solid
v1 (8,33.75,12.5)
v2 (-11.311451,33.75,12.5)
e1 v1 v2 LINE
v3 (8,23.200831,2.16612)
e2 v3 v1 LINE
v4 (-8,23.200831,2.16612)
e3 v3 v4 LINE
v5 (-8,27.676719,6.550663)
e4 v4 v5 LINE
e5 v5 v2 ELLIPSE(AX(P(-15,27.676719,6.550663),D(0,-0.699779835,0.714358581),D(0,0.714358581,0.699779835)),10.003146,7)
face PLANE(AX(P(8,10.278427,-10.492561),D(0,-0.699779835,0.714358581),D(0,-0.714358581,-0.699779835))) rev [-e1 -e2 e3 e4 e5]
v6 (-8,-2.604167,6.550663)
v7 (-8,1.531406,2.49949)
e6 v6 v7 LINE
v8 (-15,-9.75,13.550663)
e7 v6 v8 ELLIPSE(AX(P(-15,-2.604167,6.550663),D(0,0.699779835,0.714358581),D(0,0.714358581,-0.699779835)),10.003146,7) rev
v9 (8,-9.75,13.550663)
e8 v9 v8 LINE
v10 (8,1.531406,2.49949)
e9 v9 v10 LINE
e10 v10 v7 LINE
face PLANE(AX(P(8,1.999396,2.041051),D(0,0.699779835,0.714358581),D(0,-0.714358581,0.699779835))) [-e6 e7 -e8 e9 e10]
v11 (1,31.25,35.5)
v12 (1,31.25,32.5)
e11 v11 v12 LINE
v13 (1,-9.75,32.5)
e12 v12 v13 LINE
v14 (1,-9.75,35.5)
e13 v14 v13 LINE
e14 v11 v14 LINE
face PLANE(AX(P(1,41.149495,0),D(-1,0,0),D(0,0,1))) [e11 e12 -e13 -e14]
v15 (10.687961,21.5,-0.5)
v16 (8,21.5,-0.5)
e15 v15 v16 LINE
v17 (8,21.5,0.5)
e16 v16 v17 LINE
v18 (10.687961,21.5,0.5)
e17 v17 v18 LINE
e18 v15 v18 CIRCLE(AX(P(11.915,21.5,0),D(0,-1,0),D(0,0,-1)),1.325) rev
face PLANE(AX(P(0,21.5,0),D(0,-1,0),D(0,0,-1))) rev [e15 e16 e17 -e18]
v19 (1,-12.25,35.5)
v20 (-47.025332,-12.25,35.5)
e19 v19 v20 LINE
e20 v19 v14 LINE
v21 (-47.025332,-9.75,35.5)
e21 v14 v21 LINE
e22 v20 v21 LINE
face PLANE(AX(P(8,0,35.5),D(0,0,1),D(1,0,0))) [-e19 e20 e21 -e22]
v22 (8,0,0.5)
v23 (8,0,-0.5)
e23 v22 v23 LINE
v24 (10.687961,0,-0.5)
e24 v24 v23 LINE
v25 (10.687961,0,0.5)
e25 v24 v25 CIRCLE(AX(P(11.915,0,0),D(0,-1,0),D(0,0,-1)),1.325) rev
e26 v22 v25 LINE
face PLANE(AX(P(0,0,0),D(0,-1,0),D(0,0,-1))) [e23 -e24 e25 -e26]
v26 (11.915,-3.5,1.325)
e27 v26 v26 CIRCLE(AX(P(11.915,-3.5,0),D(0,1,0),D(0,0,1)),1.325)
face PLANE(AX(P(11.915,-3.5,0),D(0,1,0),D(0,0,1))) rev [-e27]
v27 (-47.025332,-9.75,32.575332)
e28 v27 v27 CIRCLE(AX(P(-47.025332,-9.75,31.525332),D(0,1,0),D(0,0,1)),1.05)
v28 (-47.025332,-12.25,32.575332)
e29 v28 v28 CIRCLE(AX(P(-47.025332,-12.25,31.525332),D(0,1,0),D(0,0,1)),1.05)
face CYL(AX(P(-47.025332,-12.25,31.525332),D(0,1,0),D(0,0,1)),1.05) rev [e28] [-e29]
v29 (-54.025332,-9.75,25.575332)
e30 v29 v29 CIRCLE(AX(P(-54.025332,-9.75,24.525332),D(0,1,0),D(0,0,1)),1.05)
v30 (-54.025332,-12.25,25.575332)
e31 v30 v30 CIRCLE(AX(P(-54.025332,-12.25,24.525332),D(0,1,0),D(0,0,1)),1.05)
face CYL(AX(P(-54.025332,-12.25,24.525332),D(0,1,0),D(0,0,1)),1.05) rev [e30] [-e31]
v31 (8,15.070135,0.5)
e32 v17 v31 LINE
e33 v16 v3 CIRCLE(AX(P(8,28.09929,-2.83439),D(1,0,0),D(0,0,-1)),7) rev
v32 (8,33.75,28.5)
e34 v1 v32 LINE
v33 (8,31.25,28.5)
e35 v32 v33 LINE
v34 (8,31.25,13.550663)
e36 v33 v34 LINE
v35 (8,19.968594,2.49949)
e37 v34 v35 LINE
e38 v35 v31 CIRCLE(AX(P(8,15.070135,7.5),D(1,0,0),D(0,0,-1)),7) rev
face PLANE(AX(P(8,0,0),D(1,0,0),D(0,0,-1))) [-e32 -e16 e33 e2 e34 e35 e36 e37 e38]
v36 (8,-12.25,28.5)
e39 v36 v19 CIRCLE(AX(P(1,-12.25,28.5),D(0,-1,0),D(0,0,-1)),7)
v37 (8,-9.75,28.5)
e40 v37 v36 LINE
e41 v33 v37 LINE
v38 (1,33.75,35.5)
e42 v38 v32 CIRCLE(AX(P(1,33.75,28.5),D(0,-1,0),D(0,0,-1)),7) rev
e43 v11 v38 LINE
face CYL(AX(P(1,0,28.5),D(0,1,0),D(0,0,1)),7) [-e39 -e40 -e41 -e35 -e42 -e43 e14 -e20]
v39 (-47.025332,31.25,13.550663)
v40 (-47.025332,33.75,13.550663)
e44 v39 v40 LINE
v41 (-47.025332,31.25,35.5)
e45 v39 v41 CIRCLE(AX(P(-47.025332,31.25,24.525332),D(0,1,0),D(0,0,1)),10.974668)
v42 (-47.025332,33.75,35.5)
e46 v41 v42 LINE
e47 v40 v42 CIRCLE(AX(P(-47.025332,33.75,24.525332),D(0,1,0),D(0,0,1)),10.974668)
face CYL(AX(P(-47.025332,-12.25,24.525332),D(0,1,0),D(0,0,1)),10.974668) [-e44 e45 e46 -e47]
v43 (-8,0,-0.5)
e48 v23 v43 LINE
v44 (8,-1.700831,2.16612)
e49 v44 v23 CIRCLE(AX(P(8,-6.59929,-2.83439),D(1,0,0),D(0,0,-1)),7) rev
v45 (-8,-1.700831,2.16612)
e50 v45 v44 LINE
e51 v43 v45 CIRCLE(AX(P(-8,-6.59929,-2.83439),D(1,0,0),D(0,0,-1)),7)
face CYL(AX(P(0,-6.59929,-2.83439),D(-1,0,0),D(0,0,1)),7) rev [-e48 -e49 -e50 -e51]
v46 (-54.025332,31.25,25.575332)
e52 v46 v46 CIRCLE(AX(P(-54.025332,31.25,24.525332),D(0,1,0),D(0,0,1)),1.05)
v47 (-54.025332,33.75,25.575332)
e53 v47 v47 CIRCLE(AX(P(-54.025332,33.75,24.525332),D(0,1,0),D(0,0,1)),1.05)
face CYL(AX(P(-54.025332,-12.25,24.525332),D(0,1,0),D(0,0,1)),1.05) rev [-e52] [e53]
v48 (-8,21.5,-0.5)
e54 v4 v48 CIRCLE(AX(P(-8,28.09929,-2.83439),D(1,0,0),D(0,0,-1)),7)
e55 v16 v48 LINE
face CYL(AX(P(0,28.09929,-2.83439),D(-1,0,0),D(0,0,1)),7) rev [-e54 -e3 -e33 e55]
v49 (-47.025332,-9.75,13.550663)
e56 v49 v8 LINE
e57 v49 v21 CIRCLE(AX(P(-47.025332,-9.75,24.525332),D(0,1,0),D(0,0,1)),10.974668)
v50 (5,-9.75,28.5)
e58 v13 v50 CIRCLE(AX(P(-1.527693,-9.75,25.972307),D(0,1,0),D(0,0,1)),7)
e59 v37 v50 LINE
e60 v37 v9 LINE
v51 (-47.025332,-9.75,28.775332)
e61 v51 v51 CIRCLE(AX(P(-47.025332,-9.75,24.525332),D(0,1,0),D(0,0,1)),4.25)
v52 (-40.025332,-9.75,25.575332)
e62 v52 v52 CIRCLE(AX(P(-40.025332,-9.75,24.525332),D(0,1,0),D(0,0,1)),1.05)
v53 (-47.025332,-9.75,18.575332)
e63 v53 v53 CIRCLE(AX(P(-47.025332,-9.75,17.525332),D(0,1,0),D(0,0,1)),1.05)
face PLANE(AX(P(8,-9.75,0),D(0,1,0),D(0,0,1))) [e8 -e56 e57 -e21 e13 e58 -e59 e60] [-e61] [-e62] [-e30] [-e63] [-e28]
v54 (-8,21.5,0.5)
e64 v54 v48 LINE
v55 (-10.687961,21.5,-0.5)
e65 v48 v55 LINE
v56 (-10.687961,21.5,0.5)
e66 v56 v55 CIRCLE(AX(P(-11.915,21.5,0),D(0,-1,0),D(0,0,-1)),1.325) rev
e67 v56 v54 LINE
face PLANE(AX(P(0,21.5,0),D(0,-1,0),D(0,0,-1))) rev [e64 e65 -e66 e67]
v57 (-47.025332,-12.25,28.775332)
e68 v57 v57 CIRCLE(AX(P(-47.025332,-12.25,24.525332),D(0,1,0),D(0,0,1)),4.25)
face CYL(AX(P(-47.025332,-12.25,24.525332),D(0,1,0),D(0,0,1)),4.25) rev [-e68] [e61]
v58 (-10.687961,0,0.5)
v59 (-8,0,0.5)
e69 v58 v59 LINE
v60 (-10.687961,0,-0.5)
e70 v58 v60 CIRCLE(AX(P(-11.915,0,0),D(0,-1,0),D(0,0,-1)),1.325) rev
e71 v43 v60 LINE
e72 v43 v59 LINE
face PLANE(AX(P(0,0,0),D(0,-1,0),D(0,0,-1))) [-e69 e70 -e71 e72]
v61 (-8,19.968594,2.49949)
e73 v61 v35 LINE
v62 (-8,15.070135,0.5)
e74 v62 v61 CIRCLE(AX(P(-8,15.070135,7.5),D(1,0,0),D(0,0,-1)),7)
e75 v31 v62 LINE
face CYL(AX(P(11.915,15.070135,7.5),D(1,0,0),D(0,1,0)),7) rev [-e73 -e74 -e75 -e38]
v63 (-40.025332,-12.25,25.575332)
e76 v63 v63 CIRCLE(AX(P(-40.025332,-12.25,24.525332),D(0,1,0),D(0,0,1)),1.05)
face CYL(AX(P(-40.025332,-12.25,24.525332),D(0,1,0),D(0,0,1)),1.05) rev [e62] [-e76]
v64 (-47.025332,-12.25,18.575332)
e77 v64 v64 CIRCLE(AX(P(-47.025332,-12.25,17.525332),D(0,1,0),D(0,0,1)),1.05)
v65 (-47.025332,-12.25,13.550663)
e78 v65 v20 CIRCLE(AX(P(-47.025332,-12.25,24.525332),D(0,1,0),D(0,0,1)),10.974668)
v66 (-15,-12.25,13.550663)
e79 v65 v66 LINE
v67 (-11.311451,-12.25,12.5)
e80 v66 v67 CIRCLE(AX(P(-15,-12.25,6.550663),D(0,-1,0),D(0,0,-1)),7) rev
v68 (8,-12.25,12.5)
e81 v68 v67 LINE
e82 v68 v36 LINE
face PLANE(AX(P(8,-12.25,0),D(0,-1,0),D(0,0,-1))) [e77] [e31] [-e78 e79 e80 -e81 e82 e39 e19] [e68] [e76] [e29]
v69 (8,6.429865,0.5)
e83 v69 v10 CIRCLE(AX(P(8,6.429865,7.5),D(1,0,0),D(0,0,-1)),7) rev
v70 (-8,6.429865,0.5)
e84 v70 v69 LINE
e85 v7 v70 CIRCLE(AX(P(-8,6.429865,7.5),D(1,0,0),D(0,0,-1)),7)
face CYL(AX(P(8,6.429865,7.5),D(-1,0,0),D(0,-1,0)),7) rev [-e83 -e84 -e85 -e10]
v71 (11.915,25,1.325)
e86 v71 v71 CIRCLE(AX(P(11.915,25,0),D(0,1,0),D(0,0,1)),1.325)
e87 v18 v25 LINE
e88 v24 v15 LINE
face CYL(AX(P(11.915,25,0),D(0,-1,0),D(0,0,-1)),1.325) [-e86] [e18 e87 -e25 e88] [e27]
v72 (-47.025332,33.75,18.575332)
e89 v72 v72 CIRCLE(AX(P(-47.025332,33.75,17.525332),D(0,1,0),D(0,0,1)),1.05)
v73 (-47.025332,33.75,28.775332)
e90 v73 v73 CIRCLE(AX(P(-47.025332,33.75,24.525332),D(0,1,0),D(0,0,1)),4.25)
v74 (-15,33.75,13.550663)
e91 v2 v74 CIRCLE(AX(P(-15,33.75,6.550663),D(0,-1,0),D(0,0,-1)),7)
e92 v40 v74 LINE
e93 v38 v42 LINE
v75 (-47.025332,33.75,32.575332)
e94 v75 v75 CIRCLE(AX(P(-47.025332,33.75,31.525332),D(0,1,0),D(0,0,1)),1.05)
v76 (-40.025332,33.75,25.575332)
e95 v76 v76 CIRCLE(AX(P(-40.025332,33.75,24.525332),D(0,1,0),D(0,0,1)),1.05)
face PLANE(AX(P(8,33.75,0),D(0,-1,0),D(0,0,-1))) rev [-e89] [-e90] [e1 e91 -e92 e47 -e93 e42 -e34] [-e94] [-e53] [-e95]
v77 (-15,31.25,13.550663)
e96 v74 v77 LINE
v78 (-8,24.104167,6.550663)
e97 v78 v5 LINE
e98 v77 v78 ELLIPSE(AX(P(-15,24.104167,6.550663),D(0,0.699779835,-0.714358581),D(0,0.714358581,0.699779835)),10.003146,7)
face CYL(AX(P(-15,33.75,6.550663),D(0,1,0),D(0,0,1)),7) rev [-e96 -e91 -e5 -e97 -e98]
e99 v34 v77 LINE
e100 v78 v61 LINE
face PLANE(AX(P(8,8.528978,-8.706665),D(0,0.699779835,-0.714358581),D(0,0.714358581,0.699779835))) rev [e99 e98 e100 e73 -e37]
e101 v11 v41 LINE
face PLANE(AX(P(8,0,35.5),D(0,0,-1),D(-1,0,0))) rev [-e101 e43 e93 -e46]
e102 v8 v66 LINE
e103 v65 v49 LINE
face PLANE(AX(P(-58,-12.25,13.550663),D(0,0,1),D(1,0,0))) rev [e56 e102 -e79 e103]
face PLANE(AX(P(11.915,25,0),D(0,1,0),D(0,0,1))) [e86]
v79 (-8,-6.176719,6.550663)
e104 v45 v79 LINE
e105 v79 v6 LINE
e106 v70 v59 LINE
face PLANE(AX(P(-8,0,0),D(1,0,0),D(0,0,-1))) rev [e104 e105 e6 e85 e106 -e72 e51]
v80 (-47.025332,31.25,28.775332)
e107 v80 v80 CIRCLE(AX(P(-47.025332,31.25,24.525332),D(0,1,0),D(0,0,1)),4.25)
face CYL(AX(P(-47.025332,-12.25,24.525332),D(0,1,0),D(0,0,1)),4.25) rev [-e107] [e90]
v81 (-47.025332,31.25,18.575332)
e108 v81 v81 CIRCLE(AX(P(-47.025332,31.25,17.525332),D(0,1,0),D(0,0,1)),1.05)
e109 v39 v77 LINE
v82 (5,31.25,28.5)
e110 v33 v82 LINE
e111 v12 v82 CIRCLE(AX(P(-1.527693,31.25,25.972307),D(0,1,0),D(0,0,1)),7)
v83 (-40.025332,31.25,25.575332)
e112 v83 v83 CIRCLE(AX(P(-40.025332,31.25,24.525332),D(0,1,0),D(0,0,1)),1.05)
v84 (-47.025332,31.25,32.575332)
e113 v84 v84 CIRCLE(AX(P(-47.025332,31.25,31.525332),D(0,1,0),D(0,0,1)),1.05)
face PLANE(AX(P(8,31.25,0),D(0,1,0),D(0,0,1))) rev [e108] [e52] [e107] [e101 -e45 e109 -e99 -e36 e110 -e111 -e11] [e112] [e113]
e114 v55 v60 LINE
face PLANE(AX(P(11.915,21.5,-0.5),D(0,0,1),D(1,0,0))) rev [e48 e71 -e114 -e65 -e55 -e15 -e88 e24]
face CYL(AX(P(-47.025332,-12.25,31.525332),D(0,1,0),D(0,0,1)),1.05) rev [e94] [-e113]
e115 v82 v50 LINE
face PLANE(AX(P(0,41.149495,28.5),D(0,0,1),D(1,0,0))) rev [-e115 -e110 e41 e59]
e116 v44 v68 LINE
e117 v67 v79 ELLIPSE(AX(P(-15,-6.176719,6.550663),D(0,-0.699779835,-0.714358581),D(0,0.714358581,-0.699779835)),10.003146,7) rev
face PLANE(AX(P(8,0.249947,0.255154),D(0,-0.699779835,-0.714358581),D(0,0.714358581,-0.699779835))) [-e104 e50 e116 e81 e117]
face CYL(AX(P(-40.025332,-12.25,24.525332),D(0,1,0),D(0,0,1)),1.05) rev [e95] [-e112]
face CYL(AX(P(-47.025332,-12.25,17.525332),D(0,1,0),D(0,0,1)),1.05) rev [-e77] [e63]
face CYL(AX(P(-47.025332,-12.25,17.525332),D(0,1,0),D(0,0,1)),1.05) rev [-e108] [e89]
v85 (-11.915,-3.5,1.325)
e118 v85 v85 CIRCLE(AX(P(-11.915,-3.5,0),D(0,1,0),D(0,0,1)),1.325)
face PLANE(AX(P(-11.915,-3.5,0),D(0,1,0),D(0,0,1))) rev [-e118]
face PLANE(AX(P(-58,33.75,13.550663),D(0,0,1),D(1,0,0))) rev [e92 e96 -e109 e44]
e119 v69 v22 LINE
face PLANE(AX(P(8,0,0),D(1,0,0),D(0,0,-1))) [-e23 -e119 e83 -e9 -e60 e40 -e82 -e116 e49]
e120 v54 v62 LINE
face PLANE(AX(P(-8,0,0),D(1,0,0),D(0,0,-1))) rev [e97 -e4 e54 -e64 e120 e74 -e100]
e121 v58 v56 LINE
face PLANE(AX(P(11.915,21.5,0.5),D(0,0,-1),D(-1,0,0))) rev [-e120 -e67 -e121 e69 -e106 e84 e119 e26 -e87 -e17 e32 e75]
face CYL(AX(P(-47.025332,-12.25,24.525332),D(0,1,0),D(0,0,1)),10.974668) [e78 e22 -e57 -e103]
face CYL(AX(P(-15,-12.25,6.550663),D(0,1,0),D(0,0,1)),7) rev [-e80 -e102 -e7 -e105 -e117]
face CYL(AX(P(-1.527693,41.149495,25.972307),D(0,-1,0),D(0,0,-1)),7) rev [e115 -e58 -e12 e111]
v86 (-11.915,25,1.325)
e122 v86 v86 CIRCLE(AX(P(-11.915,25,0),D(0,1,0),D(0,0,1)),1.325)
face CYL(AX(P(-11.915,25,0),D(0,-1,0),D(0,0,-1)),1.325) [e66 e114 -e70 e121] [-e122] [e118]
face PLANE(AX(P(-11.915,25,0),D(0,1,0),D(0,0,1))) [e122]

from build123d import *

# Parameters (mm, degrees)
SKETCH1_W           = 23.83
SKETCH1_H           = 1
BOSS_EXTRUDE1_DEPTH = 21.5
SKETCH2_R           = 1.325
BOSS_EXTRUDE2_DEPTH = 14.25
BOSS_EXTRUDE4_DEPTH = 8
SKETCH5_W           = 21.949336604
SKETCH5_H           = 2.5
BOSS_EXTRUDE5_DEPTH = 50
SKETCH6_R           = 4.25
SKETCH6_R_2         = 1.05
CUT_EXTRUDE1_DEPTH  = 83.099025573
FILLET1_R           = 7
FILLET2_R           = 7
FILLET3_R           = 7
BOSS_EXTRUDE6_START = 41
BOSS_EXTRUDE6_DEPTH = 41


with BuildPart() as part:
    # Sketch1 → Boss-Extrude1 (new body)
    with BuildSketch(Plane(origin=(0, 0, 0), x_dir=(1, 0, 0), z_dir=(0, 1, 0))):
        Rectangle(SKETCH1_W, SKETCH1_H)
    extrude(amount=BOSS_EXTRUDE1_DEPTH)

    # Sketch2 → Boss-Extrude2 (add, symmetric)
    with BuildSketch(Plane(origin=(0, 10.75, 0), x_dir=(1, 0, 0), z_dir=(0, 1, 0))):
        with Locations(Location((-11.915, 0, 0), (0, 0, 270))):
            Circle(SKETCH2_R)
        with Locations(Location((11.915, 0, 0), (0, 0, 270))):
            Circle(SKETCH2_R)
    extrude(amount=BOSS_EXTRUDE2_DEPTH, both=True)

    # Sketch4 → Boss-Extrude4 (add, symmetric)
    with BuildSketch(Plane(origin=(0, 0, 0), x_dir=(0, 0, -1), z_dir=(1, 0, 0))):
        Polygon((-0.5, 17.927447783), (-0.5, 21.5), (-12.5, 33.75), (-35.5, 33.75), (-35.5, 31.25), (-13.550663396, 31.25), align=None)
        Polygon((-0.5, 0), (-0.5, 3.572552217), (-13.550663396, -9.75), (-35.5, -9.75), (-35.5, -12.25), (-12.5, -12.25), align=None)
    extrude(amount=BOSS_EXTRUDE4_DEPTH, both=True)

    # Sketch5 → Boss-Extrude5 (add)
    with BuildSketch(Plane.ZY.offset(8)):
        with Locations((24.525331698, 32.5)):
            Rectangle(SKETCH5_W, SKETCH5_H)
        with Locations((24.525331698, -11)):
            Rectangle(SKETCH5_W, SKETCH5_H)
    extrude(amount=BOSS_EXTRUDE5_DEPTH)

    # Sketch6 → Cut-Extrude1 (cut, through all)
    with BuildSketch(Plane(origin=(0, 33.75, 0), x_dir=(1, 0, 0), z_dir=(0, 1, 0))):
        with Locations(Location((-47.025331698, -24.525331698, 0), (0, 0, 270))):
            Circle(SKETCH6_R)
        with Locations(Location((-54.025331698, -24.525331698, 0), (0, 0, 270))):
            Circle(SKETCH6_R_2)
        with Locations(Location((-47.025331698, -17.525331698, 0), (0, 0, 270))):
            Circle(SKETCH6_R_2)
        with Locations(Location((-40.025331698, -24.525331698, 0), (0, 0, 270))):
            Circle(SKETCH6_R_2)
        with Locations(Location((-47.025331698, -31.525331698, 0), (0, 0, 270))):
            Circle(SKETCH6_R_2)
        with BuildLine():
            ThreePointArc((-58, -24.525331743), (-54.785594092, -16.765069336), (-47.025331698, -13.550663396))
            Line((-47.025331698, -13.550663396), (-58, -13.550663396))
            Line((-58, -13.550663396), (-58, -24.525331743))
        make_face()
        with BuildLine():
            ThreePointArc((-47.025331698, -35.5), (-54.78559406, -32.285594092), (-58, -24.525331743))
            Line((-58, -24.525331743), (-58, -35.5))
            Line((-58, -35.5), (-47.025331698, -35.5))
        make_face()
    extrude(amount=-CUT_EXTRUDE1_DEPTH, mode=Mode.SUBTRACT)

    # Fillet1
    # the kernel refuses this fillet: 7 mm, written as the material it adds along each edge
    with BuildSketch(Plane(origin=(-8, -12.25, 13.550663396), x_dir=(-1, 0, 0), z_dir=(0, 1, 0))) as fillet1_piece_1_section:
        with BuildLine():
            CenterArc((FILLET1_R, -FILLET1_R), FILLET1_R, 90, 90)
            Line((0, -FILLET1_R), (0, 0))
            Line((0, 0), (FILLET1_R, 0))
        make_face()
    fillet1_piece_1 = extrude(amount=2.5, mode=Mode.PRIVATE)
    fillet1_piece_1 = split(fillet1_piece_1, bisect_by=Plane(origin=(-10.015975833, -11.661011889, 11.923032054), z_dir=(0, 0.699779834816443, 0.7143585813751185)), keep=Keep.TOP, mode=Mode.PRIVATE)
    fillet1_piece_1 = split(fillet1_piece_1, bisect_by=Plane(origin=(-10.015975833, -9.911562302, 13.708928508), z_dir=(0, -0.699779834816443, -0.7143585813751185)), keep=Keep.TOP, mode=Mode.PRIVATE)
    add(fillet1_piece_1)
    with BuildSketch(Plane(origin=(-8, -12.25, 13.550663396), x_dir=(-1, 0, 0), z_dir=(0, 1, 0))) as fillet1_piece_2_section:
        with BuildLine():
            CenterArc((FILLET1_R, -FILLET1_R), FILLET1_R, 90, 90)
            Line((0, -FILLET1_R), (0, 0))
            Line((0, 0), (FILLET1_R, 0))
        make_face()
    fillet1_piece_2 = extrude(amount=20, mode=Mode.PRIVATE)
    fillet1_piece_2 = split(fillet1_piece_2, bisect_by=Plane(origin=(-8.812454151, -9.294822672, 9.605132414), z_dir=(0, 0.699779834816443, 0.7143585813751185)), keep=Keep.TOP, mode=Mode.PRIVATE)
    fillet1_piece_2 = split(fillet1_piece_2, bisect_by=Plane(origin=(-8.812454151, -9.75, 10.768831879), z_dir=(0, 1, 0)), keep=Keep.TOP, mode=Mode.PRIVATE)
    fillet1_piece_2 = split(fillet1_piece_2, bisect_by=Plane(origin=(-8.812454151, -7.545373085, 11.391028867), z_dir=(0, -0.699779834816443, -0.7143585813751185)), keep=Keep.TOP, mode=Mode.PRIVATE)
    add(fillet1_piece_2)
    with BuildSketch(Plane(origin=(-8, 33.75, 13.550663396), x_dir=(0, 0, -1), z_dir=(0, -1, 0))) as fillet1_piece_3_section:
        with BuildLine():
            CenterArc((FILLET1_R, -FILLET1_R), FILLET1_R, 90, 90)
            Line((0, -FILLET1_R), (0, 0))
            Line((0, 0), (FILLET1_R, 0))
        make_face()
    fillet1_piece_3 = extrude(amount=2.5, mode=Mode.PRIVATE)
    fillet1_piece_3 = split(fillet1_piece_3, bisect_by=Plane(origin=(-10.015975833, 31.411562301, 13.708928507), z_dir=(0, 0.6997798348164432, -0.7143585813751182)), keep=Keep.TOP, mode=Mode.PRIVATE)
    fillet1_piece_3 = split(fillet1_piece_3, bisect_by=Plane(origin=(-10.015975833, 33.161011889, 11.923032054), z_dir=(0, -0.699779834816443, 0.7143585813751185)), keep=Keep.TOP, mode=Mode.PRIVATE)
    add(fillet1_piece_3)
    with BuildSketch(Plane(origin=(-8, 33.75, 13.550663396), x_dir=(0, 0, -1), z_dir=(0, -1, 0))) as fillet1_piece_4_section:
        with BuildLine():
            CenterArc((FILLET1_R, -FILLET1_R), FILLET1_R, 90, 90)
            Line((0, -FILLET1_R), (0, 0))
            Line((0, 0), (FILLET1_R, 0))
        make_face()
    fillet1_piece_4 = extrude(amount=20, mode=Mode.PRIVATE)
    fillet1_piece_4 = split(fillet1_piece_4, bisect_by=Plane(origin=(-8.812454159, 29.045373088, 11.39102887), z_dir=(0, 0.6997798348164432, -0.7143585813751182)), keep=Keep.TOP, mode=Mode.PRIVATE)
    fillet1_piece_4 = split(fillet1_piece_4, bisect_by=Plane(origin=(-8.812454159, 30.794822675, 9.605132416), z_dir=(0, -0.699779834816443, 0.7143585813751185)), keep=Keep.TOP, mode=Mode.PRIVATE)
    fillet1_piece_4 = split(fillet1_piece_4, bisect_by=Plane(origin=(-8.812454159, 31.25, 10.768831882), z_dir=(0, -1, 0)), keep=Keep.TOP, mode=Mode.PRIVATE)
    add(fillet1_piece_4)
    # the kernel refuses this fillet: 7 mm, written as the material it takes off along each edge
    with BuildSketch(Plane(origin=(8, 7.75, 35.5), x_dir=(0, 0, -1), z_dir=(0, -1, 0))) as fillet1_2_piece_1:
        with BuildLine():
            CenterArc((FILLET1_R, -FILLET1_R), FILLET1_R, 90, 90)
            Line((0, -FILLET1_R), (0, 0))
            Line((0, 0), (FILLET1_R, 0))
        make_face()
    extrude(amount=37.5, mode=Mode.SUBTRACT)
    with BuildSketch(Plane(origin=(8, 51.25, 35.5), x_dir=(-1, 0, 0), z_dir=(0, -1, 0))) as fillet1_2_piece_2:
        with BuildLine():
            CenterArc((FILLET1_R, FILLET1_R), FILLET1_R, 180, 90)
            Line((0, FILLET1_R), (0, 0))
            Line((0, 0), (FILLET1_R, 0))
        make_face()
    extrude(amount=37.5, mode=Mode.SUBTRACT)

    # Fillet2
    fillet2_edges = [part.edges().sort_by_distance(p)[0] for p in [
        (0, 17.927447783, 0.5),
        (0, 3.572552217, 0.5),
    ]]
    fillet(fillet2_edges, radius=FILLET2_R)

    # Fillet3
    # the kernel refuses this fillet: 7 mm, written as the material it adds along each edge
    with BuildSketch(Plane(origin=(-8, 21.5, 0.5), x_dir=(0, 0.7143585813744706, 0.6997798348171044), z_dir=(1, 0, 0))) as fillet3_piece_1:
        with BuildLine():
            CenterArc((2.380920079, -7), FILLET3_R, 90, 26.110260914)
            Line((-0.699779835, -0.714358581), (0, 0))
            Line((0, 0), (2.380920079, 0))
        make_face()
    extrude(amount=16)
    with BuildSketch(Plane(origin=(8, 0, 0.5), x_dir=(0, 0, -1), z_dir=(-1, 0, 0))) as fillet3_piece_2:
        with BuildLine():
            CenterArc((3.33439021, 6.599289533), FILLET3_R, 224.409342785, 26.110260914)
            Line((-1.666119859, 1.70083069), (0, 0))
            Line((0, 0), (1, 0))
        make_face()
    extrude(amount=16)

    # Sketch8 → Boss-Extrude6 (add)
    with BuildSketch(Plane(origin=(0, -9.75, 0), x_dir=(1, 0, 0), z_dir=(0, 1, 0)).offset(BOSS_EXTRUDE6_START)):
        with BuildLine():
            ThreePointArc((1, -35.5), (5.949747468, -33.449747468), (8, -28.5))
            Line((8, -28.5), (5, -28.5))
            ThreePointArc((5, -28.5), (3.422054899, -30.922054899), (1, -32.5))
            Line((1, -32.5), (1, -35.5))
        make_face()
    extrude(amount=-BOSS_EXTRUDE6_DEPTH)


solid = part.part
